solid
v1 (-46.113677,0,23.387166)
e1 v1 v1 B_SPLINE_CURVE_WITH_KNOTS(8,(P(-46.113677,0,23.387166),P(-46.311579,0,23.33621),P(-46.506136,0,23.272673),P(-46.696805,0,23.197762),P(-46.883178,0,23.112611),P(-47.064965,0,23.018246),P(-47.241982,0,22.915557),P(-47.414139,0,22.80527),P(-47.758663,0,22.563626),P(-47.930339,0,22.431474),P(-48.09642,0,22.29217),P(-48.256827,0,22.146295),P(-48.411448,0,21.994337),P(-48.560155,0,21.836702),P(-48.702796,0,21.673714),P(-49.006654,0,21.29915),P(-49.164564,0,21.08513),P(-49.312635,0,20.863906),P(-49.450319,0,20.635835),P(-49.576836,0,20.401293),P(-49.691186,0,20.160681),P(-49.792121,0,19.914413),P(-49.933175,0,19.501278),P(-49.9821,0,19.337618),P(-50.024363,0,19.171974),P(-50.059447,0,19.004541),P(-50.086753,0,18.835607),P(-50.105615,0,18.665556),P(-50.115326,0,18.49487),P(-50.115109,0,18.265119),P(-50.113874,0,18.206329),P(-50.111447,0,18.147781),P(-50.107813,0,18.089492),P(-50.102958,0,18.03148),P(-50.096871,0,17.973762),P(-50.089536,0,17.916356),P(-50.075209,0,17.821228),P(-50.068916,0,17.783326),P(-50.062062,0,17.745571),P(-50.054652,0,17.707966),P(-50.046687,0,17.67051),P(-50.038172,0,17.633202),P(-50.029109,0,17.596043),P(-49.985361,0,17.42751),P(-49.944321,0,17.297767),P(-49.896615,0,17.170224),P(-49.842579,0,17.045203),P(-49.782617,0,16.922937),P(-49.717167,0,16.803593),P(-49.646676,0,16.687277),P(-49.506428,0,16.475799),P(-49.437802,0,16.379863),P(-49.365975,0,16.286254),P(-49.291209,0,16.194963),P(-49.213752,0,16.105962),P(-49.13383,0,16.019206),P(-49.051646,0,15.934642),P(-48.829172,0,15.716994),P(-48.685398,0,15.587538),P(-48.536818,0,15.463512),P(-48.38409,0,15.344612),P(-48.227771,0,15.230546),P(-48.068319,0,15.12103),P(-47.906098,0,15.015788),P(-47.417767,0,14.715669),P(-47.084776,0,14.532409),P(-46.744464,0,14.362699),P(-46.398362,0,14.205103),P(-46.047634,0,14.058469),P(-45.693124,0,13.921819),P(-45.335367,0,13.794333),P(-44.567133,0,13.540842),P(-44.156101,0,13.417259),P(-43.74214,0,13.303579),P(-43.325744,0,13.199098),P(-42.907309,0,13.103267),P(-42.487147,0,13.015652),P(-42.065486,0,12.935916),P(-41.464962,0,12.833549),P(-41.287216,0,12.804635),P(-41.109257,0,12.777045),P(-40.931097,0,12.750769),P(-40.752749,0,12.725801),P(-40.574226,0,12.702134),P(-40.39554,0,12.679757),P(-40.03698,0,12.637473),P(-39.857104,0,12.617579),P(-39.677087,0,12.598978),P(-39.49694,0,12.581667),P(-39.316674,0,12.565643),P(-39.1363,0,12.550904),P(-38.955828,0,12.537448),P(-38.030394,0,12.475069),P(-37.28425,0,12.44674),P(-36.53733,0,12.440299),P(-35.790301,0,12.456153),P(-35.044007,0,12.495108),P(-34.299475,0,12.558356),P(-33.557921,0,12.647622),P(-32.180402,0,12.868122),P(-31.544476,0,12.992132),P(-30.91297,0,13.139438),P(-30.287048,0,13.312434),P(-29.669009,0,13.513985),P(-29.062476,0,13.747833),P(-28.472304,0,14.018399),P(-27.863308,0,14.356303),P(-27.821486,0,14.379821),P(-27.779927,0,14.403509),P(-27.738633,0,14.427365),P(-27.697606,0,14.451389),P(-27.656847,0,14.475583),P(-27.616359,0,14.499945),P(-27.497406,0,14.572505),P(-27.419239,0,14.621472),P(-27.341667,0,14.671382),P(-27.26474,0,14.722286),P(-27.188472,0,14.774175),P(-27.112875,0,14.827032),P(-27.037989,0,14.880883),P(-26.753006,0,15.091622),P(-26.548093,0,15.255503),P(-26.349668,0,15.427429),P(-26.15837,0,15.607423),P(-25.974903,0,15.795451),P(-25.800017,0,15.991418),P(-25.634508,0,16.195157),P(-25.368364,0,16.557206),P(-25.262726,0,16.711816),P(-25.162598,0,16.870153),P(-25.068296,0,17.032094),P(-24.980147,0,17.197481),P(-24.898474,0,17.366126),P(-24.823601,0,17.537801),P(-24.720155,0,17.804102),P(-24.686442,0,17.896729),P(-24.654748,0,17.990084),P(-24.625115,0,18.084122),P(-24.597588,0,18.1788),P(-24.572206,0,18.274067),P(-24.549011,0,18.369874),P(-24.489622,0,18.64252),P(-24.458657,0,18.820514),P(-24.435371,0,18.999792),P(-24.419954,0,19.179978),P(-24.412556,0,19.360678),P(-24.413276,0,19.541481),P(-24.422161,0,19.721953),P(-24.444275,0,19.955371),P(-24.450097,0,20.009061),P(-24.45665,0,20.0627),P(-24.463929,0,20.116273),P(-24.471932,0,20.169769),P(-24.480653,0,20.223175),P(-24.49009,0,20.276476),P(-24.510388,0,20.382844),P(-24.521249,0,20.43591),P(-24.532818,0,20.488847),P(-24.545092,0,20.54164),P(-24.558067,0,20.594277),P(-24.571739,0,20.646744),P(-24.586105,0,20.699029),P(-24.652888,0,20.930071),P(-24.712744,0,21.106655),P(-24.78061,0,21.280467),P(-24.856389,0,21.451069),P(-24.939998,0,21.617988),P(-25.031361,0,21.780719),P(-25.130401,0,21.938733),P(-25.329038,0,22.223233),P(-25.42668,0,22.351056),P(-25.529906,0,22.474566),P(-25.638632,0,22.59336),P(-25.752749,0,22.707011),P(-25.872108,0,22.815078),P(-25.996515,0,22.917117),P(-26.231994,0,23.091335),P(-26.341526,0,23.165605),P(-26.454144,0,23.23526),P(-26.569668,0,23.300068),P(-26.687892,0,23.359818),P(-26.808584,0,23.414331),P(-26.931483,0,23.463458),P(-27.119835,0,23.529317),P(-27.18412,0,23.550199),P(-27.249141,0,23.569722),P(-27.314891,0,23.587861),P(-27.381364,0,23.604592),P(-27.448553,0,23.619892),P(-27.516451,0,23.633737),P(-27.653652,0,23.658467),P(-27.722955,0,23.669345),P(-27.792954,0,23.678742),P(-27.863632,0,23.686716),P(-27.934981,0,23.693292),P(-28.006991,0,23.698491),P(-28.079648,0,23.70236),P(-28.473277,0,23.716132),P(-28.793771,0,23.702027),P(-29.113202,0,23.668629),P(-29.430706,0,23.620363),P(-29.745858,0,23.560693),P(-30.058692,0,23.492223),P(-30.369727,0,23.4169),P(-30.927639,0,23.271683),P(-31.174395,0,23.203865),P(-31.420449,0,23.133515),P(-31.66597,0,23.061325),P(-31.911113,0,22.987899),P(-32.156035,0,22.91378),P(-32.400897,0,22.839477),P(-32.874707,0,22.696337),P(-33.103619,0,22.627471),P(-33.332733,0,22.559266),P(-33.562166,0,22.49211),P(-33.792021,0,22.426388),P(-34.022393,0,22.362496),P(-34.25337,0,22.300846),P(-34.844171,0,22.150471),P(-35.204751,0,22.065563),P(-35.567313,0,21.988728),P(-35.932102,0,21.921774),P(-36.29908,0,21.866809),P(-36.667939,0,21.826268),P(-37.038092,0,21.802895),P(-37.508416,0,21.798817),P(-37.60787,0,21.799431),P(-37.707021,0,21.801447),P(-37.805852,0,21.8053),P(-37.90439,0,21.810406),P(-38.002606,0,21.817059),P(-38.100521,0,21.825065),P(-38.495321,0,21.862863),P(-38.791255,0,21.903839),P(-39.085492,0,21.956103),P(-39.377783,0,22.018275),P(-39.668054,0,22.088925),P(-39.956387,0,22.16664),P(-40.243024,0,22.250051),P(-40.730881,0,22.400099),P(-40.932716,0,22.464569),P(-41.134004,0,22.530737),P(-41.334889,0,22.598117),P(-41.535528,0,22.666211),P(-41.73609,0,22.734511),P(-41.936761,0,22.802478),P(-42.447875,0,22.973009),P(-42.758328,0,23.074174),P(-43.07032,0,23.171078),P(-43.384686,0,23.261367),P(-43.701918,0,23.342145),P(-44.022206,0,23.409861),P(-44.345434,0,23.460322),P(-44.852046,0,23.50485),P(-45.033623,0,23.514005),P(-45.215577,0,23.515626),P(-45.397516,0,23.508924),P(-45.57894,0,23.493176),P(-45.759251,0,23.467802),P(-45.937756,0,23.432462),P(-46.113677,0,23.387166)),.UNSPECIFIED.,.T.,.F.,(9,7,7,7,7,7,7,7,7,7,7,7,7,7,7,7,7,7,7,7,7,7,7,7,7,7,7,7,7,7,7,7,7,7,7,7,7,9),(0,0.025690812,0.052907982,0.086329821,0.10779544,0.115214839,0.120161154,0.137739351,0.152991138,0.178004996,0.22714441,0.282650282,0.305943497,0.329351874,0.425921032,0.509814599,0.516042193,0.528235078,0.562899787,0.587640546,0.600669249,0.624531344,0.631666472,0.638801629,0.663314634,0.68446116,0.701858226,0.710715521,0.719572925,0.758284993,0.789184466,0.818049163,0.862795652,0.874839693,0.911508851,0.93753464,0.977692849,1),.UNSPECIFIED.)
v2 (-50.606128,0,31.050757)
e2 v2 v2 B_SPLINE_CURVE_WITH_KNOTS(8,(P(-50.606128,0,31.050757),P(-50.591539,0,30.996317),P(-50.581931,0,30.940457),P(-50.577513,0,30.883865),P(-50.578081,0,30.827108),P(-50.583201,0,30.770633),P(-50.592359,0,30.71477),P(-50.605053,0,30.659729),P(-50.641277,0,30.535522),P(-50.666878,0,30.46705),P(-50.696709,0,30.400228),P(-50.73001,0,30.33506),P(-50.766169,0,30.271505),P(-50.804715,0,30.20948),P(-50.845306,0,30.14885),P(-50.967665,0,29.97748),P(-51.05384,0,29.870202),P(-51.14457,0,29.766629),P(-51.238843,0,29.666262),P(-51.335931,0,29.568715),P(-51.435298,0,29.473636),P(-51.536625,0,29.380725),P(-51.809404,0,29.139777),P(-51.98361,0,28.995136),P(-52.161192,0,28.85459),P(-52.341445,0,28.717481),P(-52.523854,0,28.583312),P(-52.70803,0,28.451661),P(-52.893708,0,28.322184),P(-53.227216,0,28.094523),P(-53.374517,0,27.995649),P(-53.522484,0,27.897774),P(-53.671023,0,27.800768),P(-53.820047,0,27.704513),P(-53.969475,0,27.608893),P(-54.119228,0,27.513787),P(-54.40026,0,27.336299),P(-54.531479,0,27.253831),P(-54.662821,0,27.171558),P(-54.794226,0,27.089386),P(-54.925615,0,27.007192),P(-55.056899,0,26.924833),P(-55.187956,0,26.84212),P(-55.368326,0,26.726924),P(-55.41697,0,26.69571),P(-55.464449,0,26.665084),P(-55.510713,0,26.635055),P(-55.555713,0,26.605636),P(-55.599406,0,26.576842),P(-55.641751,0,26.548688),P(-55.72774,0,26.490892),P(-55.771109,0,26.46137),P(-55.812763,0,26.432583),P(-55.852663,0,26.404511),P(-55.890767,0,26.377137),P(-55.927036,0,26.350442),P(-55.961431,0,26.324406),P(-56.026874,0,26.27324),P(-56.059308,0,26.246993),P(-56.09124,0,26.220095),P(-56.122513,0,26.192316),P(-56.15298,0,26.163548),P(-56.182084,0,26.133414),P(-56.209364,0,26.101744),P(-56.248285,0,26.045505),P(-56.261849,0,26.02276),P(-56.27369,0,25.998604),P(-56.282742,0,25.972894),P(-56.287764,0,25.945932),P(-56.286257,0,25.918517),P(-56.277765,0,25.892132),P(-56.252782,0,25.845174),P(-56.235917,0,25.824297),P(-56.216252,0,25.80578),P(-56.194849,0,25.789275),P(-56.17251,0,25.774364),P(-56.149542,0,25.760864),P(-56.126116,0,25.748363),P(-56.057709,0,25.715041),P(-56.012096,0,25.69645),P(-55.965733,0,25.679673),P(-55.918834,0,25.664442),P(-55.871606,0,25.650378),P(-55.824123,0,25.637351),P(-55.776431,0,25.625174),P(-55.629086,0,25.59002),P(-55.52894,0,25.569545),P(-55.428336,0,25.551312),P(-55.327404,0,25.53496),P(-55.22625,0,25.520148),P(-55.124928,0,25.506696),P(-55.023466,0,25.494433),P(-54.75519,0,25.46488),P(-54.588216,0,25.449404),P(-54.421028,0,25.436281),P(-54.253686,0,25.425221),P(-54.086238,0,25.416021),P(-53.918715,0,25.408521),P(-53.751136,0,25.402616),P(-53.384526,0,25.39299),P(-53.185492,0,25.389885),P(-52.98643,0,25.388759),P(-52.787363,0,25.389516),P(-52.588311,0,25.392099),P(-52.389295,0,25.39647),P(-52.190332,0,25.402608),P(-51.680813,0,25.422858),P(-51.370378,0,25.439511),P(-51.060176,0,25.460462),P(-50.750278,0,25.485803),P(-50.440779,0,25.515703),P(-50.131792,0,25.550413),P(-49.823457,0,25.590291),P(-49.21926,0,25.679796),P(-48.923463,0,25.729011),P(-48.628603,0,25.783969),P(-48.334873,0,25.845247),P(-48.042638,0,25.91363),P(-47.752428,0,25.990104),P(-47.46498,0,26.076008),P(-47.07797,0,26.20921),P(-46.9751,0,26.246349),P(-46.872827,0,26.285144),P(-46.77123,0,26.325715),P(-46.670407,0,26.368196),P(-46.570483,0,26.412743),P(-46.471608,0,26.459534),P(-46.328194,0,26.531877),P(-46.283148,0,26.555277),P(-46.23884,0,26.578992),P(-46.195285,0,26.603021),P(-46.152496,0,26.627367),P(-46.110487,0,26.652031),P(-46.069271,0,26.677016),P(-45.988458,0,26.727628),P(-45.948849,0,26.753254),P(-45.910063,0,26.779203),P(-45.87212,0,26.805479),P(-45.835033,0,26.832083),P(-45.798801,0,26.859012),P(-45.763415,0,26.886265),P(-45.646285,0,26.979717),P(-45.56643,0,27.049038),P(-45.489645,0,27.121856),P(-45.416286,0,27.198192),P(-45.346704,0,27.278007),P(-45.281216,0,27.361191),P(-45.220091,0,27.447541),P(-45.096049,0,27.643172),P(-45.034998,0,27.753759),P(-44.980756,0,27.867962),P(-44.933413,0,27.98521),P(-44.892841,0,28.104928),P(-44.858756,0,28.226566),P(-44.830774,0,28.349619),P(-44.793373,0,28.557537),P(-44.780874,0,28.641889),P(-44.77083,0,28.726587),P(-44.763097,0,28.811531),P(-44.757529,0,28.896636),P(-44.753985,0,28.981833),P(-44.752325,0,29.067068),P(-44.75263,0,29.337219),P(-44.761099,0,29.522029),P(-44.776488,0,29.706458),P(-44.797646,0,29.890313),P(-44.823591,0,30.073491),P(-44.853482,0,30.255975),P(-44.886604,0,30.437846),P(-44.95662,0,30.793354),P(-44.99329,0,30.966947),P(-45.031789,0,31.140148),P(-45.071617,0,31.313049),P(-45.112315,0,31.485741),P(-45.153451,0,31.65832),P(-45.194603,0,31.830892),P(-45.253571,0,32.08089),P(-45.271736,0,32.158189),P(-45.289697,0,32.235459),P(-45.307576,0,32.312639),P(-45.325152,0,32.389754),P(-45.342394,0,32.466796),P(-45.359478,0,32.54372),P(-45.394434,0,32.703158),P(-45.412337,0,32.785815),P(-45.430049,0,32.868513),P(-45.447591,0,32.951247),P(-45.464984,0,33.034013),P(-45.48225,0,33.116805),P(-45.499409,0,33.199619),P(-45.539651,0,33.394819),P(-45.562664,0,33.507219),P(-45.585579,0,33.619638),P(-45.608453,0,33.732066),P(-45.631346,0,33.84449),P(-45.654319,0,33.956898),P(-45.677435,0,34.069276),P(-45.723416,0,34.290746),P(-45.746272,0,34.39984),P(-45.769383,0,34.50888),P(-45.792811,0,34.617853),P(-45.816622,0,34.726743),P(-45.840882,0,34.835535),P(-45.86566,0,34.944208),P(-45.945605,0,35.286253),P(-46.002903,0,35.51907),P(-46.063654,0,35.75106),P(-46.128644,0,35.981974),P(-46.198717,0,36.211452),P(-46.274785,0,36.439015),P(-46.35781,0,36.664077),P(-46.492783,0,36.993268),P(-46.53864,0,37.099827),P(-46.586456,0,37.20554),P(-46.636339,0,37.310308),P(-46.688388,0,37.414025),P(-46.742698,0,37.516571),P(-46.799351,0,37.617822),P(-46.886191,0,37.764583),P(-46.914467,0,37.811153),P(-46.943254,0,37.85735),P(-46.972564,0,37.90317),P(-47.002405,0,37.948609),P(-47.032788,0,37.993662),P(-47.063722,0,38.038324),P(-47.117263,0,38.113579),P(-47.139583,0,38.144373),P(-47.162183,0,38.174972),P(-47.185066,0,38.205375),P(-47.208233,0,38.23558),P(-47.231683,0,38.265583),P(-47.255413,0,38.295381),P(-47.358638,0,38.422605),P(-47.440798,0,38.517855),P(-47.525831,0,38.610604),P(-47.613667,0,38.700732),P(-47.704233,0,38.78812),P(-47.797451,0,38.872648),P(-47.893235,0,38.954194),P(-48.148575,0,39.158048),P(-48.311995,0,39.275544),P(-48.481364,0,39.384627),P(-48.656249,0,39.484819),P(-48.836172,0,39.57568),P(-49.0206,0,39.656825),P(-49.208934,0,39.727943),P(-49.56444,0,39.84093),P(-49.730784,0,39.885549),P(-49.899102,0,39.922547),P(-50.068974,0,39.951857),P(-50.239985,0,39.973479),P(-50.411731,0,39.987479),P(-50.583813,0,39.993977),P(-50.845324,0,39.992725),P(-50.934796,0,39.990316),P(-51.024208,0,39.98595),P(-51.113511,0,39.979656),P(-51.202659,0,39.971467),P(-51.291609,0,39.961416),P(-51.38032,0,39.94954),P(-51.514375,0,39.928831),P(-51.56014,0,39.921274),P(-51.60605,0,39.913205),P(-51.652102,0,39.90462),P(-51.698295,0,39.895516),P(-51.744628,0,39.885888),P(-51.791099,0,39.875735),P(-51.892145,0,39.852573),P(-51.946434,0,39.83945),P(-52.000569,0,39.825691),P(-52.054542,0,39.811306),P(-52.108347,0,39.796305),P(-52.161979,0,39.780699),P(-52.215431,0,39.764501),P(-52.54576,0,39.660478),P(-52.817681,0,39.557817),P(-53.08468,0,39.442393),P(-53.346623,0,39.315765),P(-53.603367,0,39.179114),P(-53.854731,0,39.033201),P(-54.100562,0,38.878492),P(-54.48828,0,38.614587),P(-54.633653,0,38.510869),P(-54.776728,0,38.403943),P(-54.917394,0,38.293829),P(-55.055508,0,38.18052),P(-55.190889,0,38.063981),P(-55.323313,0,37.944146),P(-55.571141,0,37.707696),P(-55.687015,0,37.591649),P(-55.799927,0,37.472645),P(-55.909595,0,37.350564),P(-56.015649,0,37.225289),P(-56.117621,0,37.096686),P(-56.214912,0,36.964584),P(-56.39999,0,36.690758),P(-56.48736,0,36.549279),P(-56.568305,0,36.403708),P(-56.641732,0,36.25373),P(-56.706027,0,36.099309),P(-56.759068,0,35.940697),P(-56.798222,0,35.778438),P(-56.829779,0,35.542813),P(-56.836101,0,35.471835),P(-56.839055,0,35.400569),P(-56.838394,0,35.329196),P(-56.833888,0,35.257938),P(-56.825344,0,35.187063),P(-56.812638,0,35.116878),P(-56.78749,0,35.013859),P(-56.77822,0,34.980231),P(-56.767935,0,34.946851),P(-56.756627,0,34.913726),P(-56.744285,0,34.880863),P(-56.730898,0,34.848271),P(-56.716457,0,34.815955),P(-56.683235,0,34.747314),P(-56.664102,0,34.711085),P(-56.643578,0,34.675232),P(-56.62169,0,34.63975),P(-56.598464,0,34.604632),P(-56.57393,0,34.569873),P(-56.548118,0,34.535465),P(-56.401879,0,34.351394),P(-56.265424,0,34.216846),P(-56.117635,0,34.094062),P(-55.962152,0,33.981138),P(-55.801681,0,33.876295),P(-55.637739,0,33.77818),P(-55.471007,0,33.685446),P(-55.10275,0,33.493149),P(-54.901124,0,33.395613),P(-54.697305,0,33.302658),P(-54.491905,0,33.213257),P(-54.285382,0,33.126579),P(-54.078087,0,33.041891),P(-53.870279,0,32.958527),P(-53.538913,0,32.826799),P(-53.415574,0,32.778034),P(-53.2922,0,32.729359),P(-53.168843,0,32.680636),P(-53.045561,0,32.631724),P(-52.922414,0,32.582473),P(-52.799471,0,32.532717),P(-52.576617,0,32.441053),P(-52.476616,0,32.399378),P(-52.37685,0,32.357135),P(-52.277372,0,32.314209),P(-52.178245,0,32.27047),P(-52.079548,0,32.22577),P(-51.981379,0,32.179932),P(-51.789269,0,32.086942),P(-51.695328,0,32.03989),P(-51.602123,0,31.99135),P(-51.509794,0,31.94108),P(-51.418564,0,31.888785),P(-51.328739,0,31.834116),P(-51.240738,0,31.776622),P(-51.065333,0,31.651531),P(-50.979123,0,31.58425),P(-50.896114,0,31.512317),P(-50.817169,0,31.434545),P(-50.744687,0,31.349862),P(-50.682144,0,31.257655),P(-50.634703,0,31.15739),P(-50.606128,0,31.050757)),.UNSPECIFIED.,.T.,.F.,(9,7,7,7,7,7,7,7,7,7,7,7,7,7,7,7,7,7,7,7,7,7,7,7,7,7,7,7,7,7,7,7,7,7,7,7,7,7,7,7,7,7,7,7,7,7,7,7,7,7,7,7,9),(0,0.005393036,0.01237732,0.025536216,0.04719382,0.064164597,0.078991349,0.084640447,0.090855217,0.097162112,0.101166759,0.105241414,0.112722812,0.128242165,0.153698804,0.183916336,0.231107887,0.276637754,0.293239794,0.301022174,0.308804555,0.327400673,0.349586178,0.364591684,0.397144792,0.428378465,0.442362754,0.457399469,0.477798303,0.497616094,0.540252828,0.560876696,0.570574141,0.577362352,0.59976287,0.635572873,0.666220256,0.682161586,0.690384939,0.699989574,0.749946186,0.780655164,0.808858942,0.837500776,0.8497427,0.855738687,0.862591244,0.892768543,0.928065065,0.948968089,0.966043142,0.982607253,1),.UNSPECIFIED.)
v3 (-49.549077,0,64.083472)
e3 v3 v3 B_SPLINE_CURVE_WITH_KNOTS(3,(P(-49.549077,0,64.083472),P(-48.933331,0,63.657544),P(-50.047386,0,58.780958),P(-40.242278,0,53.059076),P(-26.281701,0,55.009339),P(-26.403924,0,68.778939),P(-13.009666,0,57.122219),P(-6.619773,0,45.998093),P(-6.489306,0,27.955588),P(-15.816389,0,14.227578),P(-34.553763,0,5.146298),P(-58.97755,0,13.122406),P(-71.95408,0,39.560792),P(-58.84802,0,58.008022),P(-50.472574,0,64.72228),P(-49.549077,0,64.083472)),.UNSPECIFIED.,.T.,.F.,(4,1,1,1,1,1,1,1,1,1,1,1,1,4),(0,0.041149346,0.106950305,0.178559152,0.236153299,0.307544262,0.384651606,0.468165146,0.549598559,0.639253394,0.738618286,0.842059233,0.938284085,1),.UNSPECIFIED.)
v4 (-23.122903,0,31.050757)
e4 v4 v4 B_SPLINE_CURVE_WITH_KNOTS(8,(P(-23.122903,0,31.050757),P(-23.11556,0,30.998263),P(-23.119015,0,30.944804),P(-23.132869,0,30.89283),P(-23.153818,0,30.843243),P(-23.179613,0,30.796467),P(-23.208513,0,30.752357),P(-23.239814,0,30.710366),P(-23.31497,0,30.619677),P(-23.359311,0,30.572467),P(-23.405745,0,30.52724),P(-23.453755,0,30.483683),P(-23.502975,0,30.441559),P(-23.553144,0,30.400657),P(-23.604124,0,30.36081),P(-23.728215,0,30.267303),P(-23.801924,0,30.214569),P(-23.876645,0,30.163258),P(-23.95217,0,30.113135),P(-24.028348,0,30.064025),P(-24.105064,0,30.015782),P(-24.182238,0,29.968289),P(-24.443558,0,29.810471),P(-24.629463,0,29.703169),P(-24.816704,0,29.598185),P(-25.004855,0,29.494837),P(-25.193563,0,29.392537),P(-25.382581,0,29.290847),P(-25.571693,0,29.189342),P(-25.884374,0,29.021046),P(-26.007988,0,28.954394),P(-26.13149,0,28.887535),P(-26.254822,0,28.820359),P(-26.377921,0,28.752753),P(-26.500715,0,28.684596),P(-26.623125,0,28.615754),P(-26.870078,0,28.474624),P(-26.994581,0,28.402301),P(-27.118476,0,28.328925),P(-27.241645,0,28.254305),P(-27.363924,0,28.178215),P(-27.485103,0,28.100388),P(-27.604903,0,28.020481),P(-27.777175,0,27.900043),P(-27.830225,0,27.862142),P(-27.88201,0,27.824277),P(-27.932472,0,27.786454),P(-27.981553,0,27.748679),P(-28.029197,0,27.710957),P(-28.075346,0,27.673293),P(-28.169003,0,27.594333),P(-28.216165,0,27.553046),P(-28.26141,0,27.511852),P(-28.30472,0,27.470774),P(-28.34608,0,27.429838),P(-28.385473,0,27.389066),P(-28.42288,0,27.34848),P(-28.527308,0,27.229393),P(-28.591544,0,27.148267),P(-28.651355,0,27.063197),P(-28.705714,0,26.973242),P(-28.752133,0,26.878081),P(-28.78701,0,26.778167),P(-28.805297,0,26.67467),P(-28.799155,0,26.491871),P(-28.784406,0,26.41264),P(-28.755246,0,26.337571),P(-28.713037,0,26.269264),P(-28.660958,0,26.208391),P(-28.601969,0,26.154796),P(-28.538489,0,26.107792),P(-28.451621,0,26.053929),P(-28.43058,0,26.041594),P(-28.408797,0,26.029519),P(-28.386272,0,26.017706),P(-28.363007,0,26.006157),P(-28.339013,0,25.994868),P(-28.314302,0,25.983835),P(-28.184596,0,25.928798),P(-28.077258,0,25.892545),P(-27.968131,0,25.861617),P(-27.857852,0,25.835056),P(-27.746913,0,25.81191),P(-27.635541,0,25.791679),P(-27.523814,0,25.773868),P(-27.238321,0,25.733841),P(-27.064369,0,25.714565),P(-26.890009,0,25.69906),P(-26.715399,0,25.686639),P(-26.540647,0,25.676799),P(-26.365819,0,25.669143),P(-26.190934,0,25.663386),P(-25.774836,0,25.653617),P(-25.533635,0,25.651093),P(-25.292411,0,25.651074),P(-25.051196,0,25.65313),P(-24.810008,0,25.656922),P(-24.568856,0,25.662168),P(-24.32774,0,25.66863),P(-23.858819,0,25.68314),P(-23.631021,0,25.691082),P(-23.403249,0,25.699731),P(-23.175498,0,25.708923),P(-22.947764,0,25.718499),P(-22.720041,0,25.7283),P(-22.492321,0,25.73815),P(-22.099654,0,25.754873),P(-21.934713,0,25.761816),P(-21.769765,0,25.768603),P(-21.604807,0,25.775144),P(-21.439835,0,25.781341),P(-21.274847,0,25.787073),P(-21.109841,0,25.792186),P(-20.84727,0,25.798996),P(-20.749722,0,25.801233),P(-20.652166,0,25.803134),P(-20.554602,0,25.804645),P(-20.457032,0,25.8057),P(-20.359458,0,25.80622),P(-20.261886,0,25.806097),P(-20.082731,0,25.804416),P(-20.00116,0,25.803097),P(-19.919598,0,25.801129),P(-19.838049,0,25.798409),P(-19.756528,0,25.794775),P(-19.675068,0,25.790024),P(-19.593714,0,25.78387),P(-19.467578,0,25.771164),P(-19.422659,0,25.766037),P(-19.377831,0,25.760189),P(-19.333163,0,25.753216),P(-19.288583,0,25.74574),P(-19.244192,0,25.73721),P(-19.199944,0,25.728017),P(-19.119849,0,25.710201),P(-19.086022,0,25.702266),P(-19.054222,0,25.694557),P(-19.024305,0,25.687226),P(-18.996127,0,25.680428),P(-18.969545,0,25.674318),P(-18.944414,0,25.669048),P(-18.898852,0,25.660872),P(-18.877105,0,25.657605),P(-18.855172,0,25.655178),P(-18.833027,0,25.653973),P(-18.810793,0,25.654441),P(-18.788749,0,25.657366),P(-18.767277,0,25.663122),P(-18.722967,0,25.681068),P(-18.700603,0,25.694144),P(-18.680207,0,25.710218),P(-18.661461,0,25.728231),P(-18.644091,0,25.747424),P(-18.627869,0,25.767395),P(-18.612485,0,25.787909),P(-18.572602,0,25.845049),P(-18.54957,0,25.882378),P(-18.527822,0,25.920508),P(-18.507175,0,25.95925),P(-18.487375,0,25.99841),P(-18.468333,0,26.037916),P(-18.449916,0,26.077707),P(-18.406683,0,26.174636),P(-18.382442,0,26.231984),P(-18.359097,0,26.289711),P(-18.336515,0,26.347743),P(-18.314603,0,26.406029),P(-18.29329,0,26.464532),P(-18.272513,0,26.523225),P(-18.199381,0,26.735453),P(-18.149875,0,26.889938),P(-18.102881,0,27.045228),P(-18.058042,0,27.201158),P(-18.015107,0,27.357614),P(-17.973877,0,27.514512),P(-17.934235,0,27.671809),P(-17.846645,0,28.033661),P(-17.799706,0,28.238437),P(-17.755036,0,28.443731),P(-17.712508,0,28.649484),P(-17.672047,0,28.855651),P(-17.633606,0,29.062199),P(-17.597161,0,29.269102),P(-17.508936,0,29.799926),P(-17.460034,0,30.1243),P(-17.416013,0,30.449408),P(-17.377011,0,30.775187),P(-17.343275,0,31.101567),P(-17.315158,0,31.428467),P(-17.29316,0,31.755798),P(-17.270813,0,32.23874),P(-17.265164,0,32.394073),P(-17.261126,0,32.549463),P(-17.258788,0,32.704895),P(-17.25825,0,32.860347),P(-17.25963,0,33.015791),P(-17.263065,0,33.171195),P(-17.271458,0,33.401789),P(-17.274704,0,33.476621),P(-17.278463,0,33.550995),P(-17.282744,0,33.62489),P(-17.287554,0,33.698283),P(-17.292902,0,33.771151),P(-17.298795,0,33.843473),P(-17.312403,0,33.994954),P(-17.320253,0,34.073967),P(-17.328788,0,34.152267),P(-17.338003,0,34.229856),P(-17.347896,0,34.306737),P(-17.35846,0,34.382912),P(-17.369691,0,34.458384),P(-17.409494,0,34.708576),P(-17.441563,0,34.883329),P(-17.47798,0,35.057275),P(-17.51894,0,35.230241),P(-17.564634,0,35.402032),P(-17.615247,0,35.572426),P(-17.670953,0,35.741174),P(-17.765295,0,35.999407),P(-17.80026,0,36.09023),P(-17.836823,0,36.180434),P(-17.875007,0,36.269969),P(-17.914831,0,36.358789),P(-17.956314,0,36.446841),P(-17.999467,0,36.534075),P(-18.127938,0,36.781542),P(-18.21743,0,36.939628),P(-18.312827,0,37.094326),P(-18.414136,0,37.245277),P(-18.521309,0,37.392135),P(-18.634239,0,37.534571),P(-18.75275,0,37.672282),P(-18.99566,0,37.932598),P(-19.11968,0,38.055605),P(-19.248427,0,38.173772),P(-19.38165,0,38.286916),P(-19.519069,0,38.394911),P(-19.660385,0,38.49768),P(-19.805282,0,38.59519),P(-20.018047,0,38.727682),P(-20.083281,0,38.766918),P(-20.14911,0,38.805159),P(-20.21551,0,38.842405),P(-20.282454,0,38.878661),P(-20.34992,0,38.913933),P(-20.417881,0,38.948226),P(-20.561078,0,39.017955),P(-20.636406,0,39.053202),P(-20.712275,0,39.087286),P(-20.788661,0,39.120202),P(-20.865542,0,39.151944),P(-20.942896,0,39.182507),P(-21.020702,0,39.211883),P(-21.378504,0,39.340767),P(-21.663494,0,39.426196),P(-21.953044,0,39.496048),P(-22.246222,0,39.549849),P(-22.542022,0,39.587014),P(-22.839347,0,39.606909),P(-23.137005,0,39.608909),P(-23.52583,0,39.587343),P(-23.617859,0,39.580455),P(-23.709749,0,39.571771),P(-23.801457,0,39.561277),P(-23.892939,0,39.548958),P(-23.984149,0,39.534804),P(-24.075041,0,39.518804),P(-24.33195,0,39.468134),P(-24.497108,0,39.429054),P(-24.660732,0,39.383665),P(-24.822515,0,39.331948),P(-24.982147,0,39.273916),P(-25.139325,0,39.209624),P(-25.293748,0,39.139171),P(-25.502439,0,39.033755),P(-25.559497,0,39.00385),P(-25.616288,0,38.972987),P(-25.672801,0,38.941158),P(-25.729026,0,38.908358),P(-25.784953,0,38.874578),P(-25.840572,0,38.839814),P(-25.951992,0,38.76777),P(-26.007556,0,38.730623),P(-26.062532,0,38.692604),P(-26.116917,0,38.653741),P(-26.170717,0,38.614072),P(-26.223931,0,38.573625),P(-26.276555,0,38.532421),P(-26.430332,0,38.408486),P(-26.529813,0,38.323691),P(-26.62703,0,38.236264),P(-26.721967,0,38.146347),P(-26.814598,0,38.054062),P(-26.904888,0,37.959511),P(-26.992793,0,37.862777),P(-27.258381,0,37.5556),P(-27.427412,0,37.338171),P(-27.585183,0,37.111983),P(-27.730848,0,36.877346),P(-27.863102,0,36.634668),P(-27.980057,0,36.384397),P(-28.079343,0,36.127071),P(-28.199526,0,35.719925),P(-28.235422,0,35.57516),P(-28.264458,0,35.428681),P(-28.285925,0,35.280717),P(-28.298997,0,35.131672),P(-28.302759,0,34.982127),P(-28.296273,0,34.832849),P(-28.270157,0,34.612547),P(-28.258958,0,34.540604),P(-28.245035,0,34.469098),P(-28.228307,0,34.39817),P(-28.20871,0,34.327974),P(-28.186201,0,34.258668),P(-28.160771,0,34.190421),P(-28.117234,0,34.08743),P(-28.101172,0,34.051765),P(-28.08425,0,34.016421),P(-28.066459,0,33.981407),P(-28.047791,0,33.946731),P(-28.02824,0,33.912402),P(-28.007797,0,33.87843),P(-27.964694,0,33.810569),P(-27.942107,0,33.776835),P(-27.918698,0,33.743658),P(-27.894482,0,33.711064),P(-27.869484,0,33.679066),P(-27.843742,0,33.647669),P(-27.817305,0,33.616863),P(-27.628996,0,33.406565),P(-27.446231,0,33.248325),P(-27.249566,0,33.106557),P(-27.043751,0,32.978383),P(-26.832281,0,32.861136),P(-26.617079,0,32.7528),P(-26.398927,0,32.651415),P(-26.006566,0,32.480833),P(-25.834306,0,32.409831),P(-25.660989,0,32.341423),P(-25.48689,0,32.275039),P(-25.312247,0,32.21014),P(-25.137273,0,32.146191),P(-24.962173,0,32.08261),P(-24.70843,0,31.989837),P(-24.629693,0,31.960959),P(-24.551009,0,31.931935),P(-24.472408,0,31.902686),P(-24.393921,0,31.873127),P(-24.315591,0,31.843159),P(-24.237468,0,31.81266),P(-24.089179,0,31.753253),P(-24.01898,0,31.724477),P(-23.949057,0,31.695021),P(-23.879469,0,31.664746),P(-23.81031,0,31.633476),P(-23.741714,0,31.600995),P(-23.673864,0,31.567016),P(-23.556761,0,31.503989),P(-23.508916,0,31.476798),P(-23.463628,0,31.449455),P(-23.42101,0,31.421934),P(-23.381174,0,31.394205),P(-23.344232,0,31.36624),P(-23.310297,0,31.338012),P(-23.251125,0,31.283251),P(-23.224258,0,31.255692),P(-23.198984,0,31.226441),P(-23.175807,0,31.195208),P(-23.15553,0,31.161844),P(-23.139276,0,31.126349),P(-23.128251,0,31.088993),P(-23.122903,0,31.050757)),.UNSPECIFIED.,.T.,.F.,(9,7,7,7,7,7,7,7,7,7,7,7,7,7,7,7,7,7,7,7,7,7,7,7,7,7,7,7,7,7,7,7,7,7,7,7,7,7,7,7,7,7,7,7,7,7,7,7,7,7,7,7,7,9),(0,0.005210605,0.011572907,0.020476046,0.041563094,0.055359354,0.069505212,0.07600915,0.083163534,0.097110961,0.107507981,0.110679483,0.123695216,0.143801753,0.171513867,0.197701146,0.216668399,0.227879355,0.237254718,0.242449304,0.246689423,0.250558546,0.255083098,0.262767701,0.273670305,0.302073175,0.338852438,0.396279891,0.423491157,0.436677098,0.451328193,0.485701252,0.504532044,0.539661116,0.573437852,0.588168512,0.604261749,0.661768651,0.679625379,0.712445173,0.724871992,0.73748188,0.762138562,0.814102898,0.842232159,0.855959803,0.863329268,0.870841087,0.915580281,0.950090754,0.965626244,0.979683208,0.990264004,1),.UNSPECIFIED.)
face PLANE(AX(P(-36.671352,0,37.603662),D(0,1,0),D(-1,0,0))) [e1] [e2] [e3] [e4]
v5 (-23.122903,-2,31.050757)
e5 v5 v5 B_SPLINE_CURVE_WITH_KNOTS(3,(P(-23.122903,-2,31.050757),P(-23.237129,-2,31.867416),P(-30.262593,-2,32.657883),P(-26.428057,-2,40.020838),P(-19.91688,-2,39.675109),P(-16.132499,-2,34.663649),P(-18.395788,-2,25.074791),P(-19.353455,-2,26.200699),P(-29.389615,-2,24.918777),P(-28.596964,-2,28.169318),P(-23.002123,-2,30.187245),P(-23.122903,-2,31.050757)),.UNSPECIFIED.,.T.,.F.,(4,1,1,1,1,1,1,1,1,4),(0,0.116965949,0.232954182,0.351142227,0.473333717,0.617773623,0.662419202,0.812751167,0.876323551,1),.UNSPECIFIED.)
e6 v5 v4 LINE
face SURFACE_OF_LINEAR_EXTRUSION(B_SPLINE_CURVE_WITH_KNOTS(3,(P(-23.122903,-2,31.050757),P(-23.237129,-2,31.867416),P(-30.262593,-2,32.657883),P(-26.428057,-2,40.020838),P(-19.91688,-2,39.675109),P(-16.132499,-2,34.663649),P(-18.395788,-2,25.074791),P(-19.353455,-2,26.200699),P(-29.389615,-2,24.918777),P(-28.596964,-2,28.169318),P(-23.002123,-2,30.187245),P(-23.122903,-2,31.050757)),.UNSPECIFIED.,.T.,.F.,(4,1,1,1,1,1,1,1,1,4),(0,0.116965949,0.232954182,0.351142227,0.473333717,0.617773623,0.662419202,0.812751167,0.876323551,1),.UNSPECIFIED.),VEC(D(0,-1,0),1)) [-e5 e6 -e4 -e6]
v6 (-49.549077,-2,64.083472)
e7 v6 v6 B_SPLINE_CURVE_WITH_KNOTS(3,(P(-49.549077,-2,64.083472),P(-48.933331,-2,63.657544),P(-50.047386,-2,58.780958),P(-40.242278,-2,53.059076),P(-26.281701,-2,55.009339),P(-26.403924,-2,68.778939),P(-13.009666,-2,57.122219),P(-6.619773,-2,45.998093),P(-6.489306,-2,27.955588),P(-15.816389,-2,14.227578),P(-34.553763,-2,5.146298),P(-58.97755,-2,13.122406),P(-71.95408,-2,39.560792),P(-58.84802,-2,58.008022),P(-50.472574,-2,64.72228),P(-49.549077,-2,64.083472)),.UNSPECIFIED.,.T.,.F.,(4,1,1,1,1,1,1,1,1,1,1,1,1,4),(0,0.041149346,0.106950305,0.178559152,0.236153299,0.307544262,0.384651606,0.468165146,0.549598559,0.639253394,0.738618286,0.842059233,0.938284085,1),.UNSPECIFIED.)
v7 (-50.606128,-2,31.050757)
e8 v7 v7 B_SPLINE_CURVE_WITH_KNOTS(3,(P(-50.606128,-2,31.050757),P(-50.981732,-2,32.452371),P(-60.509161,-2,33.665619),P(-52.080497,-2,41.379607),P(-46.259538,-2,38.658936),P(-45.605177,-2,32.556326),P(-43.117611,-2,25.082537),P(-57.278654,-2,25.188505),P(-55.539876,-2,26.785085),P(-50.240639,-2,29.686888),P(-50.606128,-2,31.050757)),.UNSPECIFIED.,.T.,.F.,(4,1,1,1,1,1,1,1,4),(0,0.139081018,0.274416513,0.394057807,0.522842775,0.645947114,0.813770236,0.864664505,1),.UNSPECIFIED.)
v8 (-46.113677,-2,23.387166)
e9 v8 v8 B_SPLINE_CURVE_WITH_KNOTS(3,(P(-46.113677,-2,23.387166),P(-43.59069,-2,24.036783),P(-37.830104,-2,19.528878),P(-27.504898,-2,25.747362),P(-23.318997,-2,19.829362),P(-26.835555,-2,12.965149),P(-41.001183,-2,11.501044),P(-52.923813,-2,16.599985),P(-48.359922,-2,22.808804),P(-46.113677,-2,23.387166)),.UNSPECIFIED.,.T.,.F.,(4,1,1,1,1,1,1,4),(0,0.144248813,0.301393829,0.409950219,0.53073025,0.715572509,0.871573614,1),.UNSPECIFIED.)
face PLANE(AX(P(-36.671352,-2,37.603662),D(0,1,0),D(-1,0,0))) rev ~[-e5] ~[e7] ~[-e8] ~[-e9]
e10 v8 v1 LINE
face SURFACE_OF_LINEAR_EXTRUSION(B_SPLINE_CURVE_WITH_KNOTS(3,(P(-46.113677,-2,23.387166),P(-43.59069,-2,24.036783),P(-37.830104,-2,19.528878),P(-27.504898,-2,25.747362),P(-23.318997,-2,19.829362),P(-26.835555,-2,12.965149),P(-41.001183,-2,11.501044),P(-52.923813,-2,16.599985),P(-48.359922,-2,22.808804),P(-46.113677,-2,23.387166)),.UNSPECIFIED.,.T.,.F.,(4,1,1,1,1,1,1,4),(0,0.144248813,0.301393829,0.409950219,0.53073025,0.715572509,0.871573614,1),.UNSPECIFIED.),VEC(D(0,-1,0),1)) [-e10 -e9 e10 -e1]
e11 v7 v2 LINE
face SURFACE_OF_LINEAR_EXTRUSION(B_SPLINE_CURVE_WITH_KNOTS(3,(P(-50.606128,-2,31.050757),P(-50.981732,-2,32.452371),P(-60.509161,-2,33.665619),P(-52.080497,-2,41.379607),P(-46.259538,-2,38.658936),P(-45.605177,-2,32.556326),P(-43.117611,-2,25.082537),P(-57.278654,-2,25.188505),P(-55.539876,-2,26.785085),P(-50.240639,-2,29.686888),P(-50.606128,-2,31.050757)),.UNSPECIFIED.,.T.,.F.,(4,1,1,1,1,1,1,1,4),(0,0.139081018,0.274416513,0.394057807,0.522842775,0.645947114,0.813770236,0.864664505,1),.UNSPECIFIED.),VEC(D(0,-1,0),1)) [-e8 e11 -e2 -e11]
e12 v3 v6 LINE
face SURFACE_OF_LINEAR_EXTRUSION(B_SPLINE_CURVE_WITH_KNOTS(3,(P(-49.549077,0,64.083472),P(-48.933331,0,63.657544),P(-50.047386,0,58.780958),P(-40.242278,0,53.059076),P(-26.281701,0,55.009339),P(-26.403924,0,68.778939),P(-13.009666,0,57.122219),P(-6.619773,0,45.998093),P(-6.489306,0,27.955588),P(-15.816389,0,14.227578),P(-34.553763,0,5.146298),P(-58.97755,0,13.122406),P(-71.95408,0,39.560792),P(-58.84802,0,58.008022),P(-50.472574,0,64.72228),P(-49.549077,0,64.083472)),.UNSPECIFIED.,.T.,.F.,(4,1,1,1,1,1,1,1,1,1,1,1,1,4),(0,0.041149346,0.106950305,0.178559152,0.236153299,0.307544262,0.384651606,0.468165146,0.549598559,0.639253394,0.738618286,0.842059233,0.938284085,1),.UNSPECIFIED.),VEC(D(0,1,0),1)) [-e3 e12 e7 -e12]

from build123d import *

# Parameters (mm, degrees)
F1_DEPTH = 2
F3_DEPTH = 25
F5_DEPTH = 25


with BuildPart() as f1:
    # F0 (on Front) → F1 (new body)
    with BuildSketch(Plane.XZ):
        with BuildLine():
            add(Edge.make_bspline(
                [(-49.5490767062, 64.0834718943), (-48.9333312885, 63.6575441472), (-50.0473862178, 58.7809579383), (-40.2422780137, 53.0590758533), (-26.2817009426, 55.0093394079), (-26.4039242659, 68.7789394166), (-13.0096656682, 57.1222193065), (-6.619772984, 45.9980926586), (-6.4893058259, 27.9555878027), (-15.8163885409, 14.2275782627), (-34.5537634201, 5.1462980778), (-58.9775502984, 13.1224064881), (-71.9540800422, 39.560792077), (-58.8480202683, 58.0080222816), (-50.4725735578, 64.7222796258), (-49.5490767062, 64.0834718943)],
                knots=[0, 0, 0, 0, 0.0411493462, 0.1069503048, 0.1785591524, 0.2361532995, 0.3075442624, 0.3846516064, 0.4681651457, 0.5495985589, 0.6392533937, 0.7386182864, 0.8420592326, 0.9382840853, 1, 1, 1, 1], degree=3))
        make_face()
    extrude(amount=F1_DEPTH)

    # F2 (on face) → F3 (cut)
    with BuildSketch(Plane.XZ.offset(2)):
        with BuildLine():
            add(Edge.make_bspline(
                [(-50.6061278284, 31.0507565737), (-50.9817318008, 32.4523710945), (-60.5091609085, 33.6656193572), (-52.080496768, 41.3796065461), (-46.2595379356, 38.658936112), (-45.6051769481, 32.5563263033), (-43.1176107758, 25.0825366979), (-57.2786539215, 25.188504599), (-55.539875681, 26.7850853614), (-50.2406390649, 29.686888256), (-50.6061278284, 31.0507565737)],
                knots=[0, 0, 0, 0, 0.1390810183, 0.274416513, 0.3940578073, 0.5228427745, 0.6459471144, 0.8137702355, 0.8646645053, 1, 1, 1, 1], degree=3))
        make_face()
        with BuildLine():
            add(Edge.make_bspline(
                [(-23.1229029596, 31.0507565737), (-23.237129146, 31.867415549), (-30.2625934836, 32.657882679), (-26.4280565006, 40.0208377866), (-19.9168801679, 39.6751090741), (-16.1324990648, 34.6636485349), (-18.3957880768, 25.0747909123), (-19.3534554956, 26.2006993496), (-29.3896150536, 24.9187769805), (-28.5969635462, 28.169318267), (-23.0021234573, 30.187244732), (-23.1229029596, 31.0507565737)],
                knots=[0, 0, 0, 0, 0.1169659491, 0.2329541817, 0.3511422269, 0.4733337166, 0.617773623, 0.6624192019, 0.8127511672, 0.876323551, 1, 1, 1, 1], degree=3))
        make_face()
    extrude(amount=-F3_DEPTH, mode=Mode.SUBTRACT)

    # F4 (on face) → F5 (cut)
    with BuildSketch(Plane.XZ.offset(2)):
        with BuildLine():
            add(Edge.make_bspline(
                [(-46.1136773229, 23.3871657401), (-43.5906896615, 24.0367826301), (-37.8301040064, 19.5288784443), (-27.5048976955, 25.7473622192), (-23.3189967208, 19.8293624238), (-26.8355548191, 12.9651489321), (-41.0011831332, 11.5010443796), (-52.9238132902, 16.5999853568), (-48.3599224178, 22.8088043097), (-46.1136773229, 23.3871657401)],
                knots=[0, 0, 0, 0, 0.1442488127, 0.3013938291, 0.4099502193, 0.5307302503, 0.7155725087, 0.8715736137, 1, 1, 1, 1], degree=3))
        make_face()
    extrude(amount=-F5_DEPTH, mode=Mode.SUBTRACT)


solid = f1.part
